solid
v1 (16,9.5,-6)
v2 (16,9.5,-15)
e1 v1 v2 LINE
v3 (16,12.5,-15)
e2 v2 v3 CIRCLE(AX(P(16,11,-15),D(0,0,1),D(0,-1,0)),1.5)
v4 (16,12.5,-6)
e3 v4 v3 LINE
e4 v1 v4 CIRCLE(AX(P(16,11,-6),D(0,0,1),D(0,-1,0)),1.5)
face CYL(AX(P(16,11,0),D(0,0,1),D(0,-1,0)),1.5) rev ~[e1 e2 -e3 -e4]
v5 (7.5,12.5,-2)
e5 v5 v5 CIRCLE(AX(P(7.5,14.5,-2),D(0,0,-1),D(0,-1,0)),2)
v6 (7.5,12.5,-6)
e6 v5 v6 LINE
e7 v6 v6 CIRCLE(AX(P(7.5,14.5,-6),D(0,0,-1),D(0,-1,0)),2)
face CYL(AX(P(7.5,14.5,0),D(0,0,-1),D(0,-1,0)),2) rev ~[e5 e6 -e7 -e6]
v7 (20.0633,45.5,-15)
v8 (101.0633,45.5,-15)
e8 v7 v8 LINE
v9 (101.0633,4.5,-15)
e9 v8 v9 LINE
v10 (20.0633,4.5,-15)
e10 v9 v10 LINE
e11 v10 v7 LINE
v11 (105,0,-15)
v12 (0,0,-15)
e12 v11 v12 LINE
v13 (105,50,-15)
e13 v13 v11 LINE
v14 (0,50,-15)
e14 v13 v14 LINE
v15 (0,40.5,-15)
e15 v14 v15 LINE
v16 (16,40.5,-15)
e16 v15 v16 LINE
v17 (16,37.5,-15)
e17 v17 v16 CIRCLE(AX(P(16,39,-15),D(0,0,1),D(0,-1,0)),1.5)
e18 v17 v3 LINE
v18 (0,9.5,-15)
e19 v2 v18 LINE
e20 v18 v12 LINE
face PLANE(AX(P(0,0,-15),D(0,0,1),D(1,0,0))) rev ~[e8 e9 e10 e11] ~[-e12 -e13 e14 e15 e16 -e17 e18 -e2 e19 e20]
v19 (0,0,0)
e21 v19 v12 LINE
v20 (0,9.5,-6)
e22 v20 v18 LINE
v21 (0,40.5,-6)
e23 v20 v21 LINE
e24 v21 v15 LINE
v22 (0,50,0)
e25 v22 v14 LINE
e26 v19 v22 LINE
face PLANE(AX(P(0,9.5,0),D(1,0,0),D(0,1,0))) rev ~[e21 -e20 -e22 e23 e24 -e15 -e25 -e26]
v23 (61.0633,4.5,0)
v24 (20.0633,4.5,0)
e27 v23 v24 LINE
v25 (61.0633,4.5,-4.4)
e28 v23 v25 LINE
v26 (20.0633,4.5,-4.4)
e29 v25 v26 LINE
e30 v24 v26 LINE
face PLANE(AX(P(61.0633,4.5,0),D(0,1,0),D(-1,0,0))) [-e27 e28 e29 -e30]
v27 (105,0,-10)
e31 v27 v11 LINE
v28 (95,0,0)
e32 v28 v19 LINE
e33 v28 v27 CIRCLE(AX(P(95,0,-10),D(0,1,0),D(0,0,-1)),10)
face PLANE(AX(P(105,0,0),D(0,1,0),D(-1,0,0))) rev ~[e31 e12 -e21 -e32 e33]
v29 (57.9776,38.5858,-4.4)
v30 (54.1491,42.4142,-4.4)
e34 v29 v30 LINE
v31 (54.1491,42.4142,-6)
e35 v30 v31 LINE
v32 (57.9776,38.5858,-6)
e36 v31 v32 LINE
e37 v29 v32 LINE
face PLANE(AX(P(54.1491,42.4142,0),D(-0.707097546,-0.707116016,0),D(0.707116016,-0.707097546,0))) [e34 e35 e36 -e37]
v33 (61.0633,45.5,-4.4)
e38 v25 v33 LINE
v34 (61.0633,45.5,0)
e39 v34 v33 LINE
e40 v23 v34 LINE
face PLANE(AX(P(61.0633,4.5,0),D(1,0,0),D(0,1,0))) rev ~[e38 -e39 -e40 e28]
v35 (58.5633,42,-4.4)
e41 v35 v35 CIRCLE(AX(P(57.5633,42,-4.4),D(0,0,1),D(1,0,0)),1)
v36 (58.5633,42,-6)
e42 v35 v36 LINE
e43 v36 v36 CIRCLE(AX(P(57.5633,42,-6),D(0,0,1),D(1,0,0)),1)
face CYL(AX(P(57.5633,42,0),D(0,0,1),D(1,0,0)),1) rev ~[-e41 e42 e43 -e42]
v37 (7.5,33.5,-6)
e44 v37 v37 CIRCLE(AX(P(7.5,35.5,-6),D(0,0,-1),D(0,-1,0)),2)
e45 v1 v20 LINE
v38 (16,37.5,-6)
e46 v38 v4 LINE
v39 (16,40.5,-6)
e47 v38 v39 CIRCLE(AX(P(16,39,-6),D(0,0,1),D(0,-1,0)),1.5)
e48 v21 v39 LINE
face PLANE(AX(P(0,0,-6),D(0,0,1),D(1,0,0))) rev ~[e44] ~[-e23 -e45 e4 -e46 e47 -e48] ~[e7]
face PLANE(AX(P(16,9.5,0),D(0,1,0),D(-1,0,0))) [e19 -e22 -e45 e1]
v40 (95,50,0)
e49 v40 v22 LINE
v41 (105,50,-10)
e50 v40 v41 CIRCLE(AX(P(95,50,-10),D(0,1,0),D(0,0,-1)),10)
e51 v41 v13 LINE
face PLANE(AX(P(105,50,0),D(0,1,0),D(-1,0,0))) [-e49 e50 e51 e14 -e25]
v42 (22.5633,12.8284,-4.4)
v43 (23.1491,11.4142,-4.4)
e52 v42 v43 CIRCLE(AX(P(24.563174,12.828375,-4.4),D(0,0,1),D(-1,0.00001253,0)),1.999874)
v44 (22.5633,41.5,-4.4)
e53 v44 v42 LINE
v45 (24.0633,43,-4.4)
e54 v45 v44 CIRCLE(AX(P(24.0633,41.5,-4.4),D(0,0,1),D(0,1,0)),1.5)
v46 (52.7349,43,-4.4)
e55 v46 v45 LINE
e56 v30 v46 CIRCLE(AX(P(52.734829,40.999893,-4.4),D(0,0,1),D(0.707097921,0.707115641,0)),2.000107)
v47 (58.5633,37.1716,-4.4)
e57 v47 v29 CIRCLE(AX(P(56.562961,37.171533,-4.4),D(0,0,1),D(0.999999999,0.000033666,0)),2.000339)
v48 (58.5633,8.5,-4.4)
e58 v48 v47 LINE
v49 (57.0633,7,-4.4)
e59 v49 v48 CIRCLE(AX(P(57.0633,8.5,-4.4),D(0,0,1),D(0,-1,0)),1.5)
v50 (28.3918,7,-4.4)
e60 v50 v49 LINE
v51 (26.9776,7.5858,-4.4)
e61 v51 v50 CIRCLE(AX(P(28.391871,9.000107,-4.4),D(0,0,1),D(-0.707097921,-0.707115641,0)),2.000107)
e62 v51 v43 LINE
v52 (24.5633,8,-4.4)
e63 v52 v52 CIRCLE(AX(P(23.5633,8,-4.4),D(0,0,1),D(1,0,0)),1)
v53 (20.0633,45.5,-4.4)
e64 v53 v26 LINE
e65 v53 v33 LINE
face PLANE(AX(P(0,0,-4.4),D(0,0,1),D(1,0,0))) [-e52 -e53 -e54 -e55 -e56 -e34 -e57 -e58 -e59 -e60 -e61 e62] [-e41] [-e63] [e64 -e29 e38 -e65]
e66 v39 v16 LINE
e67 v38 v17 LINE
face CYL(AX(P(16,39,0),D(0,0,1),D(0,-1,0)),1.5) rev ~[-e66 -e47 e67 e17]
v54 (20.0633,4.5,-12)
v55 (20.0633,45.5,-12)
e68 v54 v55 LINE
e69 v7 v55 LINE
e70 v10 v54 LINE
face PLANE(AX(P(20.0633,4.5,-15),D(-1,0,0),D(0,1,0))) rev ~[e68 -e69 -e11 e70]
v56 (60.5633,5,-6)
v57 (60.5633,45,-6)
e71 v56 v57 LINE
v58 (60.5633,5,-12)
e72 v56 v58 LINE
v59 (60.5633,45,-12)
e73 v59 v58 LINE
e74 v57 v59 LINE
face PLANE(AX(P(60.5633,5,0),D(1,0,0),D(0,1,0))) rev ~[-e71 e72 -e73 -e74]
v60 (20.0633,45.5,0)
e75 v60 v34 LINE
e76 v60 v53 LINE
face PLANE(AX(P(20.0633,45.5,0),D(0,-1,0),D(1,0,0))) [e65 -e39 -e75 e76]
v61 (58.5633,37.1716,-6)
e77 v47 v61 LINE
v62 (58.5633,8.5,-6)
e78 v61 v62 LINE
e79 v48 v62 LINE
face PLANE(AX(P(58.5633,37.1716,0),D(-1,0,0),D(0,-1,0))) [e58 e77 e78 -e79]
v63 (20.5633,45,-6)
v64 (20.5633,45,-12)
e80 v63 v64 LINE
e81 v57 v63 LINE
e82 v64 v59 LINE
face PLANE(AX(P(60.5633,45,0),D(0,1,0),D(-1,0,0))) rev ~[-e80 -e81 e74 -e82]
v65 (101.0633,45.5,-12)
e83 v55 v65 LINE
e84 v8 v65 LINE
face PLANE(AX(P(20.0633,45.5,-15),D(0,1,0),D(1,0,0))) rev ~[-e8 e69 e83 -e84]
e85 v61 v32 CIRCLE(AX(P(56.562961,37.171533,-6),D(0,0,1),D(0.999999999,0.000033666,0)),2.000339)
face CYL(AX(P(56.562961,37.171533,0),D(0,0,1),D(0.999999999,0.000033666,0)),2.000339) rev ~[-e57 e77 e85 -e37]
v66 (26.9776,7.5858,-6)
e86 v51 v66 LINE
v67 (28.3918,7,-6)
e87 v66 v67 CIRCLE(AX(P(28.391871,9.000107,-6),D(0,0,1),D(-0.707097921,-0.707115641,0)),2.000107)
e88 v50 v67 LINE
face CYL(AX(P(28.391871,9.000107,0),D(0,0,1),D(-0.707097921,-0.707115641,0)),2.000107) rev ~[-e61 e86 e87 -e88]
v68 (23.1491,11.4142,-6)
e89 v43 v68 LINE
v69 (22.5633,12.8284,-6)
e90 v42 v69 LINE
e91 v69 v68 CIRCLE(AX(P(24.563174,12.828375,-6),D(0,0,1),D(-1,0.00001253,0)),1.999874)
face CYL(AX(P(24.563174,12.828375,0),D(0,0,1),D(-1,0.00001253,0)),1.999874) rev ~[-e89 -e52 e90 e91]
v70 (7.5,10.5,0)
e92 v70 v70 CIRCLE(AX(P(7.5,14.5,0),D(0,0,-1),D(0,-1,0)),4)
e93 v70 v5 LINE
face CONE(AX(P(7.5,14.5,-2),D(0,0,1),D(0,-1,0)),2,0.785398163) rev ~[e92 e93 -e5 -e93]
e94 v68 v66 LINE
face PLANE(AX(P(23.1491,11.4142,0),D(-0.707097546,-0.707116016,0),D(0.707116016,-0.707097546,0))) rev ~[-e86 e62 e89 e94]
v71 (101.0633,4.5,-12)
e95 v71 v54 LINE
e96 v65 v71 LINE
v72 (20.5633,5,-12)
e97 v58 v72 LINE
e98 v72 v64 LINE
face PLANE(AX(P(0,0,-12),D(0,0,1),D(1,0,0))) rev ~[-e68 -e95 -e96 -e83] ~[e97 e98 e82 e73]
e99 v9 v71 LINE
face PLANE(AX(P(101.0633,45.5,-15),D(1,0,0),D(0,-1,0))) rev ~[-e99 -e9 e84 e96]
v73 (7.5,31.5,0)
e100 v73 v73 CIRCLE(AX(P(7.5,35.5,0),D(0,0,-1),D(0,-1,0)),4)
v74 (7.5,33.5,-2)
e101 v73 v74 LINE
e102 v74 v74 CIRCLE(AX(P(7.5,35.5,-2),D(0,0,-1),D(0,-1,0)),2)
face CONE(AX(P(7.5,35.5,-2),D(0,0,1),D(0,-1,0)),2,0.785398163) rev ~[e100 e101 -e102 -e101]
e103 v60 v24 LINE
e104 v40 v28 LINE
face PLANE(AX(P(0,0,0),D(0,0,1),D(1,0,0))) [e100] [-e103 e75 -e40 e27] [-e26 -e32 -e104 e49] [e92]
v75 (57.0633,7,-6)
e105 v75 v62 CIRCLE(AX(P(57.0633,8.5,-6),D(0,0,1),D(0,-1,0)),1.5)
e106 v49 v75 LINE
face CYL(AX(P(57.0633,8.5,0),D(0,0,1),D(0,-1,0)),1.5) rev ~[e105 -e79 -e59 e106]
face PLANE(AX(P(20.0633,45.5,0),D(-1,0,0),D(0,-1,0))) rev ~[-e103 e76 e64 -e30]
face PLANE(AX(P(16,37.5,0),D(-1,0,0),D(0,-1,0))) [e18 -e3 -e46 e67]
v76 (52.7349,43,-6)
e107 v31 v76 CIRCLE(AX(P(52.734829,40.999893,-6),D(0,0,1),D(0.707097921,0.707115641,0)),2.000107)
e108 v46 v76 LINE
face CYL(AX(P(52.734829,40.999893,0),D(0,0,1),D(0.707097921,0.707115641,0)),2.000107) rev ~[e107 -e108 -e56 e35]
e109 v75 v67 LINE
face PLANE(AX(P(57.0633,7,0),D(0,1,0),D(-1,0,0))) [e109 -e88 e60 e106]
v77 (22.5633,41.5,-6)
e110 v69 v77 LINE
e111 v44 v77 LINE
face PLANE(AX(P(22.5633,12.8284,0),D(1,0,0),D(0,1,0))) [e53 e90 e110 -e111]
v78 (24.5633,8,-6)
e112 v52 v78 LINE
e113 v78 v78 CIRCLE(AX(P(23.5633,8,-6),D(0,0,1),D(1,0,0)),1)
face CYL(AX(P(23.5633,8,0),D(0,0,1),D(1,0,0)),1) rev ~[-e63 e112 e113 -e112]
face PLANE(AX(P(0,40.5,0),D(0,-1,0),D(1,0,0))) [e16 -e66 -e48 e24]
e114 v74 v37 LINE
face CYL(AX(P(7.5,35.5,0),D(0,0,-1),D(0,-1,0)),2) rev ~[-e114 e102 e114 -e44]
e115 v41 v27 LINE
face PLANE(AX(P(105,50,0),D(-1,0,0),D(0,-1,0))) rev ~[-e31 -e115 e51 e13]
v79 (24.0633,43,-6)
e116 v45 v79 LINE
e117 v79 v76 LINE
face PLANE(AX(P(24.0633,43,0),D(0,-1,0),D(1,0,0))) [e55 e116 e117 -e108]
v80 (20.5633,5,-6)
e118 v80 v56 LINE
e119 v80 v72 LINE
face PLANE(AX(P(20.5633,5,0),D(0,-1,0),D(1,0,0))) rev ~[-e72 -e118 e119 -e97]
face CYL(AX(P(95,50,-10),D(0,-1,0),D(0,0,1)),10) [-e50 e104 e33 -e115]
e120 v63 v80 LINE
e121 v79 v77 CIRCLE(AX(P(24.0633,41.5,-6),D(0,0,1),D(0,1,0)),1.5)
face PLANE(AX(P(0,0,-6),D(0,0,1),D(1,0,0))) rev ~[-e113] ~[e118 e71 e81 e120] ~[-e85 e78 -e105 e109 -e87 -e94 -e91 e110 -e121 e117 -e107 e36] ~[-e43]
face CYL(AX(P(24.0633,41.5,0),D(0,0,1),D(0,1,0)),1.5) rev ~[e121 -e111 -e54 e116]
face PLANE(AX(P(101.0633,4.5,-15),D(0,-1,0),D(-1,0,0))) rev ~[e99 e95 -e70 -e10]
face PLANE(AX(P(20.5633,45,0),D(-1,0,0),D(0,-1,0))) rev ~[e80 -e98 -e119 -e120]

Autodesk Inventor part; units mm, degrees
ref_plane "YZ Plane" through (0, 0, 0) normal (1, 0, 0) x (0, 1, 0)
ref_plane "XZ Plane" through (0, 0, 0) normal (0, 1, 0) x (-1, 0, 0)
sketch "Unten" plane through (0, 0, 0) normal (0, 0, 1) x (1, 0, 0)
  line L0 (20.5633, 45) -> (20.5633, 5)
  line L1 (60.5633, 5) -> (60.5633, 45)
  line L2 (60.5633, 45) -> (20.5633, 45)
  line L3 (20.5633, 5) -> (60.5633, 5)
  line L4 (105, 50) -> (0, 50)
  line L5 (105, 0) -> (0, 0)
  line L6 (0, 40.5) -> (16, 40.5)
  line L7 (16, 37.5) -> (16, 12.5)
  line L8 (16, 9.5) -> (0, 9.5)
  line L9 (0, 9.5) -> (0, 40.5)
  line L10 (0, 50) -> (0, 0)
  line L11 (105, 50) -> (105, 0)
  circle A0 centre (23.5633, 8) radius 1
  circle A1 centre (57.5633, 42) radius 1
  line L12 (58.5633, 37.1716) -> (58.5633, 8.5)
  line L13 (57.0633, 7) -> (28.3918, 7)
  line L14 (22.5633, 12.8284) -> (22.5633, 41.5)
  line L15 (24.0633, 43) -> (52.7349, 43)
  line L16 (20.0633, 45.5) -> (61.0633, 45.5)
  line L17 (61.0633, 4.5) -> (20.0633, 4.5)
  arc A2 (57.0633, 7) -> (58.5633, 8.5) centre (57.0633, 8.5) ccw
  arc A3 (24.0633, 43) -> (22.5633, 41.5) centre (24.0633, 41.5) ccw
  line L18 (23.1491, 11.4142) -> (26.9776, 7.5858)
  line L19 (54.1491, 42.4142) -> (57.9776, 38.5858)
  arc A4 (16, 37.5) -> (16, 40.5) centre (16, 39) ccw
  arc A5 (16, 9.5) -> (16, 12.5) centre (16, 11) ccw
  line L20 (20.0633, 45.5) -> (20.0633, 4.5)
  line L21 (61.0633, 4.5) -> (61.0633, 45.5)
  line L22 (0, 25) -> (105, 25) construction
  arc A6 (22.5633, 12.8284) -> (23.1491, 11.4142) centre (24.5633, 12.8284) ccw
  arc A7 (26.9776, 7.5858) -> (28.3918, 7) centre (28.3918, 9) ccw
  arc A8 (58.5633, 37.1716) -> (57.9776, 38.5858) centre (56.5633, 37.1716) ccw
  arc A9 (54.1491, 42.4142) -> (52.7349, 43) centre (52.7349, 41) ccw
  line L23 (50, 0) -> (50, 50) construction
  line L24 (48, 39) -> (48, 40.8)
  line L25 (48, 40.8) -> (44.6, 40.8)
  line L26 (44.6, 40.8) -> (44.6, 39)
  line L27 (44.6, 39) -> (48, 39)
  line L28 (36.2594, 22.5) -> (31.2594, 22.5)
  line L29 (31.2594, 22.5) -> (31.2594, 11.5)
  line L30 (31.2594, 11.5) -> (36.2594, 11.5)
  line L31 (36.2594, 11.5) -> (36.2594, 22.5)
  line L32 (43.6, 9.7) -> (43.6, 13.1)
  line L33 (43.6, 13.1) -> (45.4, 13.1)
  line L34 (45.4, 13.1) -> (45.4, 9.7)
  line L35 (45.4, 9.7) -> (43.6, 9.7)
  point P0 (0, 0)
  point P1 (7.5, 14.5)
  point P2 (7.5, 35.5)
  point P3 (58.5633, 38)
  point P4 (27.5633, 7)
  point P5 (53.5633, 43)
  point P6 (22.5633, 12)
  point P7 (65.5633, 25)
  point P8 (44.7594, 25)
  dimension "d0" = 40
  dimension "d1" = 40
  dimension "d185" = 105
  dimension "d196" = 21
  dimension "d217" = 31
  dimension "d267" = 14.5
  dimension "d268" = 14.5
  dimension "d269" = 50
  dimension "d308" = 9.5
  dimension "d329" = 3
  dimension "d341" = 3
  dimension "d342" = 3
  dimension "d343" = 2
  dimension "d344" = 2
  dimension "d390" = 3
  dimension "d391" = 3
  dimension "d419" = 2
  dimension "d420" = 2
  dimension "d421" = 2
  dimension "d423" = 1.5
  dimension "d424" = 1.5
  dimension "d427" = 0.5
  dimension "d428" = 0.5
  dimension "d431" = 3.5
  dimension "d432" = 3.5
  dimension "d450" = 3.5
  dimension "d451" = 3.5
  dimension "d463" = 3
  dimension "d464" = 1.5
  dimension "d465" = 3
  dimension "d466" = 1.5
  dimension "d482" = 2
  dimension "d515" = 5
  dimension "d516" = 11
  dimension "d517" = 3.4
  dimension "d518" = 1.8
  dimension "d519" = 3.4
  dimension "d520" = 1.8
  dimension "d521" = 7.5
  dimension "d522" = 16
extrude "Extrusion40" add sketch "Unten" against normal blind 15 contours L11 L5 L10 L8 A5 L7 A4 L6 L4 | L16 L21 L17 L20
extrude "Extrusion46" add sketch "Unten" against normal blind 6 contours L2 L1 L3 L0
extrude "Extrusion48" cut sketch "Unten" against normal blind 4.4 contours L2 L1 L3 L0 | L12 A2 L13 A7 L18 A6 L14 A3 L15 A9 L19 A8 | L16 L21 L17 L20 | L27 L26 L25 L24 | L31 L30 L29 L28 | L32 L33 L34 L35
extrude "Extrusion41" add sketch "Unten" against normal blind 6 contours L6 A4 L7 A5 L8 L9
hole "Hole14" at (7.5, 14.5, 0) at (7.5, 35.5, 0) direction (0, 0, -1) diameter 4 end through all
chamfer "Chamfer8" distance 2 angle 45 2 edges at (7.5, 37.5, 0) (7.5, 16.5, 0)
sketch "Side" plane through (0, 0, 0) normal (0, -1, 0) x (1, 0, 0)
  line L0 (105, 0) -> (25, 0)
  line L1 (25, -3.6) -> (105, -3.6)
  line L2 (105, -3.6) -> (105, 0)
  line L3 (25, -3.6) -> (25, 0)
  point P0 (0, 0)
  dimension "d412" = 3.6
  dimension "d443" = 80
  dimension "d479" = 80
fillet "Fillet4" radius 10 1 edges at (105, 25, 0)
ref_plane "Work Plane2" through (0, 0, -15) normal (0, 0, 1) x (1, 0, 0)
sketch "Sketch9" plane through (0, 0, -15) normal (0, 0, 1) x (1, 0, 0)
  line L0 (20.0633, 4.5) -> (20.0633, 45.5) projected
  line L1 (20.0633, 45.5) -> (101.0633, 45.5)
  line L2 (101.0633, 45.5) -> (101.0633, 4.5)
  line L3 (101.0633, 4.5) -> (20.0633, 4.5)
  line L4 (20.0633, 4.5) -> (20.0633, 45.5)
  point P0 (0, 0)
  dimension "d526" = 41
  dimension "d527" = 81
extrude "Extrusion49" cut sketch "Sketch9" along normal blind 3
properties part number "TNS_V3.1_Greiferbacke" material "PVC, Unplasticized"
